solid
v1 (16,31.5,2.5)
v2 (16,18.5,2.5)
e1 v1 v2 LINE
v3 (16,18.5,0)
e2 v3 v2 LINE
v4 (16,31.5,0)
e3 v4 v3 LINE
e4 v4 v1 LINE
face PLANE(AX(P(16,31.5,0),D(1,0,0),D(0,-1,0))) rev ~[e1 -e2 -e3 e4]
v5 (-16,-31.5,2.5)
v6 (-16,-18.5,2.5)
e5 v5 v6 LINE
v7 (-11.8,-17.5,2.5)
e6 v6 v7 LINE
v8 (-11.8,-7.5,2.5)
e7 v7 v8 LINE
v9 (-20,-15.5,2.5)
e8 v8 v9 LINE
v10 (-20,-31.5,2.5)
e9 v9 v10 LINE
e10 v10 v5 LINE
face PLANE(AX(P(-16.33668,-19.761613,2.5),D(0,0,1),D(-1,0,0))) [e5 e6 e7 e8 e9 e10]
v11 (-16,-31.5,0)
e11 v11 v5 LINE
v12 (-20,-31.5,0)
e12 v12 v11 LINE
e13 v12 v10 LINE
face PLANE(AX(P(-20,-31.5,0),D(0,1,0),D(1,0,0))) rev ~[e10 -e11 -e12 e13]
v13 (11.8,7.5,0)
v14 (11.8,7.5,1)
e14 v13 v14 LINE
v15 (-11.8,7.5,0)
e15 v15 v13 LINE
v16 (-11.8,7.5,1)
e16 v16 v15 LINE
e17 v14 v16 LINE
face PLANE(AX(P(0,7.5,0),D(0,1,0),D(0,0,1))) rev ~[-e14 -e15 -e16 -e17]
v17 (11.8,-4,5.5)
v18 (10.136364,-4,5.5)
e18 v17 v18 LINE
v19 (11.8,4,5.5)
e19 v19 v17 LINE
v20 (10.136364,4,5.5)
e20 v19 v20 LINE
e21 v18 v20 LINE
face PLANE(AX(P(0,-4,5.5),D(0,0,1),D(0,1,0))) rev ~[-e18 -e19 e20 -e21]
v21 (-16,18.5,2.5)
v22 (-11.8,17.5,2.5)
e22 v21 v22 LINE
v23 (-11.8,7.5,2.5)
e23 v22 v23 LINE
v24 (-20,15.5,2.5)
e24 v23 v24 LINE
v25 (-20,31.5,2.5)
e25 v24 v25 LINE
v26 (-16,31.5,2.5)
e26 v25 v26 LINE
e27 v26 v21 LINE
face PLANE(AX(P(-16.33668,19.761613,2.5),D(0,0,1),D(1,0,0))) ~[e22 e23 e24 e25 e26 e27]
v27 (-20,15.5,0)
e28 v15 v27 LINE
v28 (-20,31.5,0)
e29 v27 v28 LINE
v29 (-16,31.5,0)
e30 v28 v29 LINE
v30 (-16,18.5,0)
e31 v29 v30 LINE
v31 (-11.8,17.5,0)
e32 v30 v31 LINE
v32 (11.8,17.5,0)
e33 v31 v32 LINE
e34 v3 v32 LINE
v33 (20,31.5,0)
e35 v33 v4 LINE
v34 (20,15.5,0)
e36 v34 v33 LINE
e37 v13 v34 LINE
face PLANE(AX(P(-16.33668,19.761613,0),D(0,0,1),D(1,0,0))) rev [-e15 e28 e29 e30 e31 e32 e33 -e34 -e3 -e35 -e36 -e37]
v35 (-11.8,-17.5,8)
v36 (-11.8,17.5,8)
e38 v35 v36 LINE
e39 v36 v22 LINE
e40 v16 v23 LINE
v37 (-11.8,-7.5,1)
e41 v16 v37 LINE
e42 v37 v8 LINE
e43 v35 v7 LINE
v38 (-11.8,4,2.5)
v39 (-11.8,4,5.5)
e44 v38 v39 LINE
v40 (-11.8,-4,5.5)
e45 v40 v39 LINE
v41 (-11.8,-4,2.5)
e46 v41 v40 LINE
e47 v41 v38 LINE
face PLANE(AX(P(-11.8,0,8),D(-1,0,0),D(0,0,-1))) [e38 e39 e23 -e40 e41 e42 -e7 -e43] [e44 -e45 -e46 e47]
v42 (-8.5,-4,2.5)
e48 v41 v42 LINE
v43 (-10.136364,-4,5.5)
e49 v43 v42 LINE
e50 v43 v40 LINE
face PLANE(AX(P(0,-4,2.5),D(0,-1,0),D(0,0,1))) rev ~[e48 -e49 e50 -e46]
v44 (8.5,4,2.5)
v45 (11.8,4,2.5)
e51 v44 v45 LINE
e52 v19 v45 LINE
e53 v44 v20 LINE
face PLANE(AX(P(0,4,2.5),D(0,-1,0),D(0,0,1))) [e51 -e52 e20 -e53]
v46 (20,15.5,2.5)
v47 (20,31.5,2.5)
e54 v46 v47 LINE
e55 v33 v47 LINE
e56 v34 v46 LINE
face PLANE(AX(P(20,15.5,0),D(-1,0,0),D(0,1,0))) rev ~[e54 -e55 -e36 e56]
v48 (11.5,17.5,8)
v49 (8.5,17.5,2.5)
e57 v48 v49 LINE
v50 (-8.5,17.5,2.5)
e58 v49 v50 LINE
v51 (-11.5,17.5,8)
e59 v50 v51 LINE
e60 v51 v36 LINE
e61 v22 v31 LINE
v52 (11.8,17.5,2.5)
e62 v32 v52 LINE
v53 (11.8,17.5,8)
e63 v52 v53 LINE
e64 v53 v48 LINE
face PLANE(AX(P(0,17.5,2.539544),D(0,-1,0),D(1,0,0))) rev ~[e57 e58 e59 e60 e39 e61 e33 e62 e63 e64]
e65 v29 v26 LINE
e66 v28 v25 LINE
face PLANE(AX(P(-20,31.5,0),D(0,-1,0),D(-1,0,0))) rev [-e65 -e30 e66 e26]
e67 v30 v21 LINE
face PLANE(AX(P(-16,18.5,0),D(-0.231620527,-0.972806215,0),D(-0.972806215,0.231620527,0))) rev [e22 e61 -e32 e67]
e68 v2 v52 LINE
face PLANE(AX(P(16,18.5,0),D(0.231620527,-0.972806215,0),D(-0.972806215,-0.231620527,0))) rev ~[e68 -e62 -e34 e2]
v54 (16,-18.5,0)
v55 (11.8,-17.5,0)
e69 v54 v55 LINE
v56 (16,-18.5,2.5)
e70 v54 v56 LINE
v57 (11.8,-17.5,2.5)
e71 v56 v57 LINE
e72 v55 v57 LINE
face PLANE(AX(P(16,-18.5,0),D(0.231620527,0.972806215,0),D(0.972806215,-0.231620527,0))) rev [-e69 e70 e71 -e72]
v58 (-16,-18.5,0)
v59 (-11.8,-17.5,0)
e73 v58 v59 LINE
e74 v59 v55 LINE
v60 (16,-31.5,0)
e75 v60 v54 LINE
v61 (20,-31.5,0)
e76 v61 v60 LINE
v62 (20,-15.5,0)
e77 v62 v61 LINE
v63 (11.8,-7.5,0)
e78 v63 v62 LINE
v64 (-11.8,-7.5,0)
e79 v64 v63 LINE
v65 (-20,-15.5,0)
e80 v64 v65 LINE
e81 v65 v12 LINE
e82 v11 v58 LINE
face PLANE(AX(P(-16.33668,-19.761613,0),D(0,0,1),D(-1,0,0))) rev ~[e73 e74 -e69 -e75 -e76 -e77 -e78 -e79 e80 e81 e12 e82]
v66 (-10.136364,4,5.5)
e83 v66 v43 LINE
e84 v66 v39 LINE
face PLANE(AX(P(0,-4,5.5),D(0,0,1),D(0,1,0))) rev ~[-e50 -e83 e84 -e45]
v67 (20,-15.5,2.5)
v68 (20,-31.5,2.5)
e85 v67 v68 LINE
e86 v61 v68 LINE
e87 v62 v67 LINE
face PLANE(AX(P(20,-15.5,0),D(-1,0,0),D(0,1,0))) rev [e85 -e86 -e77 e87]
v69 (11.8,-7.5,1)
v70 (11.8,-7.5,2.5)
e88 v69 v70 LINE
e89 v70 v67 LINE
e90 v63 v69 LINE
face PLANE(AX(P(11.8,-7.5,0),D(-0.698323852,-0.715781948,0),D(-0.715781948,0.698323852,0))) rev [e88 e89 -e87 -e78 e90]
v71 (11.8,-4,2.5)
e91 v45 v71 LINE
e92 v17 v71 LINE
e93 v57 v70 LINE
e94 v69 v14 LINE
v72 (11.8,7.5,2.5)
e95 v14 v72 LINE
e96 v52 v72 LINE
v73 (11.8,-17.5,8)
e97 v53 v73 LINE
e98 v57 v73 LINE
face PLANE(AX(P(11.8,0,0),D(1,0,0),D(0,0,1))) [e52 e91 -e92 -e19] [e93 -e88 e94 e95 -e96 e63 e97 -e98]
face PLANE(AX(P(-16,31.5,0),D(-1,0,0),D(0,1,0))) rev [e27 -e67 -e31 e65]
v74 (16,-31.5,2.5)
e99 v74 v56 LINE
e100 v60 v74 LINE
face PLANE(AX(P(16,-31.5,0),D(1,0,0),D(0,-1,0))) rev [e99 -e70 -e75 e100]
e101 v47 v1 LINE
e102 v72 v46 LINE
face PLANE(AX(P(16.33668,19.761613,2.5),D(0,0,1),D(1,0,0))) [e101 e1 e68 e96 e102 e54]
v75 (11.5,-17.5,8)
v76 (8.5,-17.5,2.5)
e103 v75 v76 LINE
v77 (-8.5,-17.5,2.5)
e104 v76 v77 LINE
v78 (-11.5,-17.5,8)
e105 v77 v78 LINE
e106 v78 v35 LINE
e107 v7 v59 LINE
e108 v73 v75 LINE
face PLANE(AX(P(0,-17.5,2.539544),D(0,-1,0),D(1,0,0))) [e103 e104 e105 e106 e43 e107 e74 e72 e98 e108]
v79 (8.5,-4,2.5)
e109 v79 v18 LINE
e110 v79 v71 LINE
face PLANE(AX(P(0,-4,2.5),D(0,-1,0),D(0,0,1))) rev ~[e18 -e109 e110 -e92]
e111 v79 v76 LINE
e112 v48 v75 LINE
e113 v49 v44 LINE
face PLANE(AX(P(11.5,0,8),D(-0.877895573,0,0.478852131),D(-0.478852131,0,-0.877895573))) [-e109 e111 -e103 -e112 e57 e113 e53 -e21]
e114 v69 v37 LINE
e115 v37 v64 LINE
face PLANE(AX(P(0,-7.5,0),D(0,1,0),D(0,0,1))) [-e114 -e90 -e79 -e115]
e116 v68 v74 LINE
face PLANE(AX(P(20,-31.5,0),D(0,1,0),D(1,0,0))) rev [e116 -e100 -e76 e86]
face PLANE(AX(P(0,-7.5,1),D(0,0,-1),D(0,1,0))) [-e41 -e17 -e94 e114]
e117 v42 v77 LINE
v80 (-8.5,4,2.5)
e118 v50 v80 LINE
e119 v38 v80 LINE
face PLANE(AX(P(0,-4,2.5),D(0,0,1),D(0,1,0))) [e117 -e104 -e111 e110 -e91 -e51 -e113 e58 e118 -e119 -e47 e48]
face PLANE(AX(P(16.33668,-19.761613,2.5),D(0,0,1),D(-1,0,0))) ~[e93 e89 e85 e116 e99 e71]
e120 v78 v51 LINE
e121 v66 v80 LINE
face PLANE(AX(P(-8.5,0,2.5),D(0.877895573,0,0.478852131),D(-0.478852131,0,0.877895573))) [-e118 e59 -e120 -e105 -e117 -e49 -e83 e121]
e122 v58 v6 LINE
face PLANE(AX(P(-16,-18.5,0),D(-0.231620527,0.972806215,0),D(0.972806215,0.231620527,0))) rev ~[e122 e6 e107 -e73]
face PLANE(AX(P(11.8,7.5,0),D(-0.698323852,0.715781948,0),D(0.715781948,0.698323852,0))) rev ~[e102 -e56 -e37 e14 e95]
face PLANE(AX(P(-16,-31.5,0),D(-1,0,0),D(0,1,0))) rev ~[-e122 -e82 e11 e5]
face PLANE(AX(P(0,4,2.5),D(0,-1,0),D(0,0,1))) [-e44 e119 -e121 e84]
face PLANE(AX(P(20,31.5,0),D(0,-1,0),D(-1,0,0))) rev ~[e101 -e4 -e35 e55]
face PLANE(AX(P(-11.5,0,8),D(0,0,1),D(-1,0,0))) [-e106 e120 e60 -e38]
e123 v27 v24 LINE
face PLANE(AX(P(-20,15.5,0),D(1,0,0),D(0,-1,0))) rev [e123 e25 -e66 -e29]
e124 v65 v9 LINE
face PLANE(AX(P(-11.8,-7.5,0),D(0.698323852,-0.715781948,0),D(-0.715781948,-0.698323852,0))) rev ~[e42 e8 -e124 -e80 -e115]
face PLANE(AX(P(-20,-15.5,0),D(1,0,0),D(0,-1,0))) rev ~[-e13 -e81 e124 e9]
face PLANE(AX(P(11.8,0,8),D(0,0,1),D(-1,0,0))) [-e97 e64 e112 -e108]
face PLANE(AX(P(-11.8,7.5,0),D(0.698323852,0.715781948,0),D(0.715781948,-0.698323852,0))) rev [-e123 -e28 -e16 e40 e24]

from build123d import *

# Parameters (mm, degrees)
F1_DEPTH         = 17.5
F2_W             = 8
F2_H             = 3
F2_W_2           = 15
F2_H_2           = 1
F3_DEPTH         = 50
F5_DEPTH         = 2.5
F5_COPIES2_COUNT = 2


# Not quite as in the source:
# - a pattern or mirror of a feature is missing from the dataset's text; its kind, count and spacing are read off the source's solid


with BuildPart() as f1:
    # F0 (on Front) → F1 (new body, symmetric)
    with BuildSketch(Plane.XZ):
        Polygon((-11.8, 0), (0, 0), (11.8, 0), (11.8, 8), (11.5, 8), (8.5, 2.5), (0, 2.5), (-8.5, 2.5), (-11.5, 8), (-11.8, 8), align=None)
    extrude(amount=F1_DEPTH, both=True)

    # F2 (on Right) → F3 (cut, symmetric)
    with BuildSketch(Plane.YZ):
        with Locations((0, 4)):
            Rectangle(F2_W, F2_H)
        with Locations((0, 0.5)):
            Rectangle(F2_W_2, F2_H_2)
    extrude(amount=F3_DEPTH, both=True, mode=Mode.SUBTRACT)

    # F4 (on Top) → F5 (join)
    with BuildSketch(Plane.XY):
        Polygon((16, 18.5), (11.8, 17.5), (11.8, 7.5), (20, 15.5), (20, 31.5), (16, 31.5), align=None)
    f5 = extrude(amount=F5_DEPTH)

    # F5_copies: F5 across plane
    add(f5.mirror(Plane(origin=(0, 0, 0), x_dir=(0, 0, -1), z_dir=(-1, 0, 0))))

    # F5_copies1: F5 across plane
    add(f5.mirror(Plane(origin=(0, 0, 0), x_dir=(0, 0, -1), z_dir=(0, -1, 0))))

    # F5_copies2: F5 ×2 about axis
    f5_copies2_axis = Axis((0, 0, 0), (0, 0, 1))
    for i in range(1, F5_COPIES2_COUNT):
        add(f5.rotate(f5_copies2_axis, i * 360 / F5_COPIES2_COUNT))


solid = f1.part
